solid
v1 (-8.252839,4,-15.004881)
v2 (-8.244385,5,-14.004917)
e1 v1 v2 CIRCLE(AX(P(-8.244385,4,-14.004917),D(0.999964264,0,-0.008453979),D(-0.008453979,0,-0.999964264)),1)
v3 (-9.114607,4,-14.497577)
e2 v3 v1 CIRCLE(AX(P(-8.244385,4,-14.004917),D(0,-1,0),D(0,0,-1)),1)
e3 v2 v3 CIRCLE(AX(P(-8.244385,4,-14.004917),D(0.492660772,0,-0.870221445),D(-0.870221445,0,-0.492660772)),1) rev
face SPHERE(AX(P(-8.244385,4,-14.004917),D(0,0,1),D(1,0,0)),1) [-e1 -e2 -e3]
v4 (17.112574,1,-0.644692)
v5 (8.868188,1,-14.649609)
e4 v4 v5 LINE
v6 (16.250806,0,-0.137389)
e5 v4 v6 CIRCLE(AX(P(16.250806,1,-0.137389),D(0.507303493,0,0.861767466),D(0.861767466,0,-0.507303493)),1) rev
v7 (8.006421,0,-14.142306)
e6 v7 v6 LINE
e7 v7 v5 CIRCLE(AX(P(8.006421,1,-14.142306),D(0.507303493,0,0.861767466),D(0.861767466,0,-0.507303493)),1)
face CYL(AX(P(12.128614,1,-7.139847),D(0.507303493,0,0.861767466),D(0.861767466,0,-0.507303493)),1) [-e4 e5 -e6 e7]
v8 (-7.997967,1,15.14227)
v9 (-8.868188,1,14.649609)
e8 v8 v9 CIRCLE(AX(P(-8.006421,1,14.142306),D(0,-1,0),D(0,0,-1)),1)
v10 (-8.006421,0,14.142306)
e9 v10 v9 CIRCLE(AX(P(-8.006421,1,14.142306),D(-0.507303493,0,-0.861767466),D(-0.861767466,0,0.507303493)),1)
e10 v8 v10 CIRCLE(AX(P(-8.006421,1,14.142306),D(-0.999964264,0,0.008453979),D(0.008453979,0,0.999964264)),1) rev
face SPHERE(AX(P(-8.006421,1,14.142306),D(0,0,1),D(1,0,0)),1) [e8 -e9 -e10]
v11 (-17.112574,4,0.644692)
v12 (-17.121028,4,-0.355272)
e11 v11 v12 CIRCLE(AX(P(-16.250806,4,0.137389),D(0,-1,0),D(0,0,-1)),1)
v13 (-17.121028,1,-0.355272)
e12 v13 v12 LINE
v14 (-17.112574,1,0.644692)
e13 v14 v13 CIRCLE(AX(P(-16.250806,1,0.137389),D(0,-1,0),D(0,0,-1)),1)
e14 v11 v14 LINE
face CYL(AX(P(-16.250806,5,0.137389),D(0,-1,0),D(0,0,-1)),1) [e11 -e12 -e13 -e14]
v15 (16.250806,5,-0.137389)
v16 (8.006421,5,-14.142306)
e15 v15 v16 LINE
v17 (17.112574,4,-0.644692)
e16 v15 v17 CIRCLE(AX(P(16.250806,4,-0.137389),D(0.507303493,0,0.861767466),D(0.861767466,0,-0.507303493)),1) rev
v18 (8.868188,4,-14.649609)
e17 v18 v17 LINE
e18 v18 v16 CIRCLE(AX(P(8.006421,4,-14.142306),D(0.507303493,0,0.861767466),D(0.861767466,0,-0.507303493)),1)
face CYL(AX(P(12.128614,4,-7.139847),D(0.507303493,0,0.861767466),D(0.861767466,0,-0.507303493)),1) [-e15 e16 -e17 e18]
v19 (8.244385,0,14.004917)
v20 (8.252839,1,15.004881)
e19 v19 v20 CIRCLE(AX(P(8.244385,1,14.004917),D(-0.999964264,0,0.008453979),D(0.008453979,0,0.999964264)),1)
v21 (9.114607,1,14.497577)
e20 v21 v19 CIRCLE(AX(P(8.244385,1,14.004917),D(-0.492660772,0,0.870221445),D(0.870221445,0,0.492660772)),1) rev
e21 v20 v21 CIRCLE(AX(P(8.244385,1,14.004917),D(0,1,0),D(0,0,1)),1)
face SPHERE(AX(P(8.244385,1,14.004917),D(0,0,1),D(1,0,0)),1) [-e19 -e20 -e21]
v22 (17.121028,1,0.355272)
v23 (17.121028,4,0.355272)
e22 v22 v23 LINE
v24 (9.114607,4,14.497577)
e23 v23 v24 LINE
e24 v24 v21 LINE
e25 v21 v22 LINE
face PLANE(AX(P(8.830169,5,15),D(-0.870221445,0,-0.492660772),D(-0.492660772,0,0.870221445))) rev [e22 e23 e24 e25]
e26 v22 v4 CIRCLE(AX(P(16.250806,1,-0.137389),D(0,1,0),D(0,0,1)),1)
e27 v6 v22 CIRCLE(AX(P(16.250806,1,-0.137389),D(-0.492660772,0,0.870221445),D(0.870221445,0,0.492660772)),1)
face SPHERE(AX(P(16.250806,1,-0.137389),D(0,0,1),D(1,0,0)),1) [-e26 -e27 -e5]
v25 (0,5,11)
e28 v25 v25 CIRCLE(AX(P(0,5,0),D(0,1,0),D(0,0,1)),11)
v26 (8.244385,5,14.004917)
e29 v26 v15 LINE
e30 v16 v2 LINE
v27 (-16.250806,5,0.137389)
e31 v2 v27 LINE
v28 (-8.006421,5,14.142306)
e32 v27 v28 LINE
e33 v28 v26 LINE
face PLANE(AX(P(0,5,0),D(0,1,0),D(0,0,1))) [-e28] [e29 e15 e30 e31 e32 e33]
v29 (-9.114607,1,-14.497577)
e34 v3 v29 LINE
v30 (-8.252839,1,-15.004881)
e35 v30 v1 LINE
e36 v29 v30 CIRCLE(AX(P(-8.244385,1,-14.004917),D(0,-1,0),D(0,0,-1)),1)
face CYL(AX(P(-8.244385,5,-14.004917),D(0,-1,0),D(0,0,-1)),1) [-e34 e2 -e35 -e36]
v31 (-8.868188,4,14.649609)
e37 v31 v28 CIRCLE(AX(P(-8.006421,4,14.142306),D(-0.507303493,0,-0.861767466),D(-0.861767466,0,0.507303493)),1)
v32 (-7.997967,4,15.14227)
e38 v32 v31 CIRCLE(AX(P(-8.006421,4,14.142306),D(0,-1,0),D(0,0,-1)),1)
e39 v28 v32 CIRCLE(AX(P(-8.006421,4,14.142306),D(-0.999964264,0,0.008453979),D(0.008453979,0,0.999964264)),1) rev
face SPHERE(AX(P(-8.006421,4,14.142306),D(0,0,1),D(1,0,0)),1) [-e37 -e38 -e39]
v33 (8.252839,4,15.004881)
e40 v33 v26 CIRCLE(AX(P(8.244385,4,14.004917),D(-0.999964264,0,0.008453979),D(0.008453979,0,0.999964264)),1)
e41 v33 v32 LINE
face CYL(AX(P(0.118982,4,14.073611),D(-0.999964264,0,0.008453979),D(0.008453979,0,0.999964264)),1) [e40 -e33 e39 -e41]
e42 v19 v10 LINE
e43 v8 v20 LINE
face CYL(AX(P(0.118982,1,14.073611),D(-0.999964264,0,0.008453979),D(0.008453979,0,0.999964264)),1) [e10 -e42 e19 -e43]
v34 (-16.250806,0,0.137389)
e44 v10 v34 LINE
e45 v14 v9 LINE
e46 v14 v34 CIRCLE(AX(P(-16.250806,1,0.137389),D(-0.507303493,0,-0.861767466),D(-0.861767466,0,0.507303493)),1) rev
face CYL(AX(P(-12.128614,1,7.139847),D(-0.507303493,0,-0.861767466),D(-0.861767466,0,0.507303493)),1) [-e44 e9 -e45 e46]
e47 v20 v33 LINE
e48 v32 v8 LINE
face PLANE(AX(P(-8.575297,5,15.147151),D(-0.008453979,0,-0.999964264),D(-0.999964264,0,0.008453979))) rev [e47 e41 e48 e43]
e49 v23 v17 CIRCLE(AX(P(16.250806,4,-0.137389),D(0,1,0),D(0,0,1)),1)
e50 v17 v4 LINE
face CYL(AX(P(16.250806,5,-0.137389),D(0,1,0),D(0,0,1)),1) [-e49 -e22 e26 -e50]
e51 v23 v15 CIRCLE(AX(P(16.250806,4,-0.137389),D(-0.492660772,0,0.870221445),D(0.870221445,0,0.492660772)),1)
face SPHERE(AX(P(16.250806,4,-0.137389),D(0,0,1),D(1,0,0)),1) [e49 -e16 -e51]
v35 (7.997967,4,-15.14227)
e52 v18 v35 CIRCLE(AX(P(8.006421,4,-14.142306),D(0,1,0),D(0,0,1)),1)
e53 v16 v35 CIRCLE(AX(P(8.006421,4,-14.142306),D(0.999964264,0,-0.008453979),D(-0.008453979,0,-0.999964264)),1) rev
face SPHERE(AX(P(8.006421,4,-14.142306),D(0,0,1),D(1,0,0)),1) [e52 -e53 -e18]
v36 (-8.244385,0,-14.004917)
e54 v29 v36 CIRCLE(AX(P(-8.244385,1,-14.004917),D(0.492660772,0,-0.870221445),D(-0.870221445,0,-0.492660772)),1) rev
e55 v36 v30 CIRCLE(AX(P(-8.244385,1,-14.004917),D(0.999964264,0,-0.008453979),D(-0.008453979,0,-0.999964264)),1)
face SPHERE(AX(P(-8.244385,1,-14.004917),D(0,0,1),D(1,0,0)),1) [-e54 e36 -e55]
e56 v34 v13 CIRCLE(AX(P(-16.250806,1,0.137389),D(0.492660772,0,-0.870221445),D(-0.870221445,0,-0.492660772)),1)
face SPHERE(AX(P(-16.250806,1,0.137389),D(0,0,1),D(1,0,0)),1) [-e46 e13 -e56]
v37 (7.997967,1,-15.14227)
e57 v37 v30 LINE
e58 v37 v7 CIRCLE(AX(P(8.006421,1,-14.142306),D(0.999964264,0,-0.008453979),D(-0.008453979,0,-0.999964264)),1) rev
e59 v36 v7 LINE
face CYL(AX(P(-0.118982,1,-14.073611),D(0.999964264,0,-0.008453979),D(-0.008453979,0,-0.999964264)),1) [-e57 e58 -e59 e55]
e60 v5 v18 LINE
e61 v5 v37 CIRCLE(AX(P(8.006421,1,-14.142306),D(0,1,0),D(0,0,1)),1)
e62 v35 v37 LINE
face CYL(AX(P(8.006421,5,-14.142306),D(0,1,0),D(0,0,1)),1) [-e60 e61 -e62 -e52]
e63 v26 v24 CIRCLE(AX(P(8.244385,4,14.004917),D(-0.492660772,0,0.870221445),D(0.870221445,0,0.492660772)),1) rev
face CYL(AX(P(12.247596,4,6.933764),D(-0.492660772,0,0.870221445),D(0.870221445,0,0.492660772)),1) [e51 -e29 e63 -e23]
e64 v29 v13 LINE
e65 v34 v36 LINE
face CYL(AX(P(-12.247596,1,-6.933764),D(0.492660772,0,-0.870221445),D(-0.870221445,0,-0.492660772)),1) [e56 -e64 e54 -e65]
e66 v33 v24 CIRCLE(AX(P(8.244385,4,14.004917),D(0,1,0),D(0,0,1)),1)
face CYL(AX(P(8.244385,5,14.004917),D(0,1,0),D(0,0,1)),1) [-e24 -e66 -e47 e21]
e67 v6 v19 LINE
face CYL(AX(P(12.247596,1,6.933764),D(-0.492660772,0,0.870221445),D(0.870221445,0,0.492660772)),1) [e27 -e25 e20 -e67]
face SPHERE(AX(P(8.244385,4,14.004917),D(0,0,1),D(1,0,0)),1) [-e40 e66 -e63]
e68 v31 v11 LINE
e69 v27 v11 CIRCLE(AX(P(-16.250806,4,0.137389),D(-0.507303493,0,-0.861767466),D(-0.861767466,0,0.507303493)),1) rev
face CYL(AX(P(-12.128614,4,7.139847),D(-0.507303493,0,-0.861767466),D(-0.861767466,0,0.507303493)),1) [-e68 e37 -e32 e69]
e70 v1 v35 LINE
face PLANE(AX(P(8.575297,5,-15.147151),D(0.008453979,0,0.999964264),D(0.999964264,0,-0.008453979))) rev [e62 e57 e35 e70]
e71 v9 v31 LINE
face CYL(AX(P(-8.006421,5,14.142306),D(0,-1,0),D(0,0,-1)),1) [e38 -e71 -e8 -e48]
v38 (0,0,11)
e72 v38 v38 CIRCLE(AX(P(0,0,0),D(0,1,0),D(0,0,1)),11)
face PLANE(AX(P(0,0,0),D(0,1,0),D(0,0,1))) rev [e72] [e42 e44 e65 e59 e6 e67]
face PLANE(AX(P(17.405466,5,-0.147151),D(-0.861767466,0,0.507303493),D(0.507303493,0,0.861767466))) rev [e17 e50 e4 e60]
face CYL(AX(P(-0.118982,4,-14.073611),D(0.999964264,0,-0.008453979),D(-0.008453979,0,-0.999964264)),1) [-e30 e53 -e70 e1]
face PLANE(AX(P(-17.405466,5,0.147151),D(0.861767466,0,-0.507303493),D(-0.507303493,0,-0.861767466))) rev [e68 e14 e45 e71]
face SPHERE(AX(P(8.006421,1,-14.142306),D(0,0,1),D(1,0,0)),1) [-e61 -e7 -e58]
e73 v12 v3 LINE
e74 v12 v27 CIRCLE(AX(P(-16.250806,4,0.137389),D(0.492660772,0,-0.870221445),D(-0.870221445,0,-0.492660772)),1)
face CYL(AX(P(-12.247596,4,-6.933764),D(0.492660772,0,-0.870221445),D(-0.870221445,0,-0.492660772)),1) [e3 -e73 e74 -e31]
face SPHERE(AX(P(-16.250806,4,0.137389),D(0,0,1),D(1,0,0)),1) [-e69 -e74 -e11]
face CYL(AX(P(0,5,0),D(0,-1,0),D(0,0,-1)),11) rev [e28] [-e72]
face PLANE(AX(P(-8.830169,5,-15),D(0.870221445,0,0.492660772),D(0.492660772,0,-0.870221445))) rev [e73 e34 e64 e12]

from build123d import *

# Parameters (mm, degrees)
SKETCH1_R           = 11
BOSS_EXTRUDE1_DEPTH = 5
FILLET1_R           = 1
FILLET2_R           = 1
FILLET3_R           = 1
FILLET4_R           = 1
FILLET5_R           = 1
FILLET6_R           = 1
FILLET7_R           = 1
FILLET8_R           = 1


with BuildPart() as part:
    # Sketch1 → Boss-Extrude1 (new body)
    with BuildSketch(Plane(origin=(0, 0, 0), x_dir=(1, 0, 0), z_dir=(0, 1, 0))):
        Polygon((8.83016903, -15), (17.405465572, 0.1471507), (8.575296542, 15.1471507), (-8.83016903, 15), (-17.405465572, -0.1471507), (-8.575296542, -15.1471507), align=None)
        with Locations(Location((0, 0, 0), (0, 0, 270))):
            Circle(SKETCH1_R, mode=Mode.SUBTRACT)
    extrude(amount=BOSS_EXTRUDE1_DEPTH)

    # Fillet1
    fillet1_edges = [part.edges().sort_by_distance(p)[0] for p in [
        (-12.990381057, 0, 7.6471507),
        (-13.117817301, 0, -7.42642465),
        (-0.127436244, 0, -15.07357535),
        (12.990381057, 0, -7.6471507),
        (13.117817301, 0, 7.42642465),
        (0.127436244, 0, 15.07357535),
    ]]
    fillet(fillet1_edges, radius=FILLET1_R)

    # Fillet2
    fillet2_edges = [part.edges().sort_by_distance(p)[0] for p in [
        (12.990381057, 5, -7.6471507),
        (-0.127436244, 5, -15.07357535),
        (-13.117817301, 5, -7.42642465),
        (-12.990381057, 5, 7.6471507),
        (0.127436244, 5, 15.07357535),
        (13.117817301, 5, 7.42642465),
    ]]
    fillet(fillet2_edges, radius=FILLET2_R)

    # Fillet3
    # the kernel refuses this fillet: 1 mm, written as the material it takes off along each edge
    with BuildSketch(Plane(origin=(8.244385414, 1, 14.004916643), x_dir=(0.870221445448491, 0, 0.4926607716081514), z_dir=(0, -1, 0))) as fillet3_piece_1_section:
        Polygon((0, 0), (FILLET3_R, 0), (FILLET3_R, FILLET3_R * 0.57735026919), (FILLET3_R * 0.5, FILLET3_R * 0.866025403784), align=None)
    fillet3_piece_1 = extrude(amount=FILLET3_R, mode=Mode.PRIVATE)
    fillet3_piece_1 = fillet3_piece_1 - Plane(origin=(8.244385414, 1, 14.004916643), x_dir=(-0.5073034928723316, 0, -0.8617674663849478), z_dir=(0, -1, 0)) * Sphere(FILLET3_R, mode=Mode.PRIVATE)
    add(fillet3_piece_1, mode=Mode.SUBTRACT)
    with BuildSketch(Plane(origin=(8.244385414, 4, 14.004916643), x_dir=(0.870221445448491, 0, 0.4926607716081514), z_dir=(0, 1, 0))) as fillet3_piece_2_section:
        Polygon((0, 0), (FILLET3_R, 0), (FILLET3_R, -FILLET3_R * 0.57735026919), (FILLET3_R * 0.5, -FILLET3_R * 0.866025403784), align=None)
    fillet3_piece_2 = extrude(amount=FILLET3_R, mode=Mode.PRIVATE)
    fillet3_piece_2 = fillet3_piece_2 - Plane(origin=(8.244385414, 4, 14.004916643), x_dir=(-0.5073034928723316, 0, -0.8617674663849478), z_dir=(0, 1, 0)) * Sphere(FILLET3_R, mode=Mode.PRIVATE)
    add(fillet3_piece_2, mode=Mode.SUBTRACT)
    with BuildSketch(Plane(origin=(8.83016903, 1, 15), x_dir=(0.4926607716081517, 0, -0.8702214454484907), z_dir=(0, 1, 0))) as fillet3_piece_3:
        with BuildLine():
            CenterArc((FILLET3_R * 0.57735026919, FILLET3_R), FILLET3_R, 210, 60)
            Line((-FILLET3_R * 0.288675134595, FILLET3_R * 0.5), (0, 0))
            Line((0, 0), (FILLET3_R * 0.57735026919, 0))
        make_face()
    extrude(amount=3, mode=Mode.SUBTRACT)

    # Fillet4
    # the kernel refuses this fillet: 1 mm, written as the material it takes off along each edge
    with BuildSketch(Plane(origin=(-8.006420883, 1, 14.142305528), x_dir=(0.008453979063543083, 0, 0.999964264480483), z_dir=(0, -1, 0))) as fillet4_piece_1_section:
        Polygon((0, 0), (FILLET4_R, 0), (FILLET4_R, FILLET4_R * 0.57735026919), (FILLET4_R * 0.5, FILLET4_R * 0.866025403784), align=None)
    fillet4_piece_1 = extrude(amount=FILLET4_R, mode=Mode.PRIVATE)
    fillet4_piece_1 = fillet4_piece_1 - Plane(origin=(-8.006420883, 1, 14.142305528), x_dir=(0.49266077160815147, 0, -0.870221445448491), z_dir=(0, -1, 0)) * Sphere(FILLET4_R, mode=Mode.PRIVATE)
    add(fillet4_piece_1, mode=Mode.SUBTRACT)
    with BuildSketch(Plane(origin=(-8.006420883, 4, 14.142305528), x_dir=(0.008453979063543083, 0, 0.999964264480483), z_dir=(0, 1, 0))) as fillet4_piece_2_section:
        Polygon((0, 0), (FILLET4_R, 0), (FILLET4_R, -FILLET4_R * 0.57735026919), (FILLET4_R * 0.5, -FILLET4_R * 0.866025403784), align=None)
    fillet4_piece_2 = extrude(amount=FILLET4_R, mode=Mode.PRIVATE)
    fillet4_piece_2 = fillet4_piece_2 - Plane(origin=(-8.006420883, 4, 14.142305528), x_dir=(0.49266077160815147, 0, -0.870221445448491), z_dir=(0, 1, 0)) * Sphere(FILLET4_R, mode=Mode.PRIVATE)
    add(fillet4_piece_2, mode=Mode.SUBTRACT)
    with BuildSketch(Plane(origin=(-8.575296542, 1, 15.1471507), x_dir=(0.9999642644804829, 0, -0.008453979063542578), z_dir=(0, 1, 0))) as fillet4_piece_3:
        with BuildLine():
            CenterArc((FILLET4_R * 0.57735026919, FILLET4_R), FILLET4_R, 210, 60)
            Line((-FILLET4_R * 0.288675134595, FILLET4_R * 0.5), (0, 0))
            Line((0, 0), (FILLET4_R * 0.57735026919, 0))
        make_face()
    extrude(amount=3, mode=Mode.SUBTRACT)

    # Fillet5
    # the kernel refuses this fillet: 1 mm, written as the material it takes off along each edge
    with BuildSketch(Plane(origin=(-16.250806297, 1, 0.137388886), x_dir=(-0.870221445448491, 0, -0.49266077160815136), z_dir=(0, -1, 0))) as fillet5_piece_1_section:
        Polygon((0, 0), (FILLET5_R, 0), (FILLET5_R, -FILLET5_R * 0.57735026919), (FILLET5_R * 0.5, -FILLET5_R * 0.866025403784), align=None)
    fillet5_piece_1 = extrude(amount=FILLET5_R, mode=Mode.PRIVATE)
    fillet5_piece_1 = fillet5_piece_1 - Plane(origin=(-16.250806297, 1, 0.137388886), x_dir=(0.9999642644804829, 0, -0.008453979063543034), z_dir=(0, -1, 0)) * Sphere(FILLET5_R, mode=Mode.PRIVATE)
    add(fillet5_piece_1, mode=Mode.SUBTRACT)
    with BuildSketch(Plane(origin=(-16.250806297, 4, 0.137388886), x_dir=(-0.870221445448491, 0, -0.49266077160815136), z_dir=(0, 1, 0))) as fillet5_piece_2_section:
        Polygon((0, 0), (FILLET5_R, 0), (FILLET5_R, FILLET5_R * 0.57735026919), (FILLET5_R * 0.5, FILLET5_R * 0.866025403784), align=None)
    fillet5_piece_2 = extrude(amount=FILLET5_R, mode=Mode.PRIVATE)
    fillet5_piece_2 = fillet5_piece_2 - Plane(origin=(-16.250806297, 4, 0.137388886), x_dir=(0.9999642644804829, 0, -0.008453979063543034), z_dir=(0, 1, 0)) * Sphere(FILLET5_R, mode=Mode.PRIVATE)
    add(fillet5_piece_2, mode=Mode.SUBTRACT)
    with BuildSketch(Plane(origin=(-17.405465572, 1, 0.1471507), x_dir=(0.4926607716081488, 0, -0.8702214454484924), z_dir=(0, 1, 0))) as fillet5_piece_3:
        with BuildLine():
            CenterArc((FILLET5_R * 0.57735026919, -FILLET5_R), FILLET5_R, 90, 60)
            Line((-FILLET5_R * 0.288675134595, -FILLET5_R * 0.5), (0, 0))
            Line((0, 0), (FILLET5_R * 0.57735026919, 0))
        make_face()
    extrude(amount=3, mode=Mode.SUBTRACT)

    # Fillet6
    # the kernel refuses this fillet: 1 mm, written as the material it takes off along each edge
    with BuildSketch(Plane(origin=(-8.244385414, 1, -14.004916643), x_dir=(-0.008453979063543077, 0, -0.9999642644804829), z_dir=(0, -1, 0))) as fillet6_piece_1_section:
        Polygon((0, 0), (FILLET6_R, 0), (FILLET6_R, -FILLET6_R * 0.57735026919), (FILLET6_R * 0.5, -FILLET6_R * 0.866025403784), align=None)
    fillet6_piece_1 = extrude(amount=FILLET6_R, mode=Mode.PRIVATE)
    fillet6_piece_1 = fillet6_piece_1 - Plane(origin=(-8.244385414, 1, -14.004916643), x_dir=(0.5073034928723316, 0, 0.8617674663849478), z_dir=(0, -1, 0)) * Sphere(FILLET6_R, mode=Mode.PRIVATE)
    add(fillet6_piece_1, mode=Mode.SUBTRACT)
    with BuildSketch(Plane(origin=(-8.244385414, 4, -14.004916643), x_dir=(-0.008453979063543077, 0, -0.9999642644804829), z_dir=(0, 1, 0))) as fillet6_piece_2_section:
        Polygon((0, 0), (FILLET6_R, 0), (FILLET6_R, FILLET6_R * 0.57735026919), (FILLET6_R * 0.5, FILLET6_R * 0.866025403784), align=None)
    fillet6_piece_2 = extrude(amount=FILLET6_R, mode=Mode.PRIVATE)
    fillet6_piece_2 = fillet6_piece_2 - Plane(origin=(-8.244385414, 4, -14.004916643), x_dir=(0.5073034928723316, 0, 0.8617674663849478), z_dir=(0, 1, 0)) * Sphere(FILLET6_R, mode=Mode.PRIVATE)
    add(fillet6_piece_2, mode=Mode.SUBTRACT)
    with BuildSketch(Plane(origin=(-8.83016903, 1, -15), x_dir=(0.9999642644804829, 0, -0.008453979063542578), z_dir=(0, 1, 0))) as fillet6_piece_3:
        with BuildLine():
            CenterArc((FILLET6_R * 0.57735026919, -FILLET6_R), FILLET6_R, 90, 60)
            Line((-FILLET6_R * 0.288675134595, -FILLET6_R * 0.5), (0, 0))
            Line((0, 0), (FILLET6_R * 0.57735026919, 0))
        make_face()
    extrude(amount=3, mode=Mode.SUBTRACT)

    # Fillet7
    # the kernel refuses this fillet: 1 mm, written as the material it takes off along each edge
    with BuildSketch(Plane(origin=(8.006420883, 1, -14.142305528), x_dir=(0.8617674663849478, 0, -0.5073034928723317), z_dir=(0, -1, 0))) as fillet7_piece_1_section:
        Polygon((0, 0), (FILLET7_R, 0), (FILLET7_R, -FILLET7_R * 0.57735026919), (FILLET7_R * 0.5, -FILLET7_R * 0.866025403784), align=None)
    fillet7_piece_1 = extrude(amount=FILLET7_R, mode=Mode.PRIVATE)
    fillet7_piece_1 = fillet7_piece_1 - Plane(origin=(8.006420883, 1, -14.142305528), x_dir=(-0.4926607716081513, 0, 0.870221445448491), z_dir=(0, -1, 0)) * Sphere(FILLET7_R, mode=Mode.PRIVATE)
    add(fillet7_piece_1, mode=Mode.SUBTRACT)
    with BuildSketch(Plane(origin=(8.006420883, 4, -14.142305528), x_dir=(0.8617674663849478, 0, -0.5073034928723317), z_dir=(0, 1, 0))) as fillet7_piece_2_section:
        Polygon((0, 0), (FILLET7_R, 0), (FILLET7_R, FILLET7_R * 0.57735026919), (FILLET7_R * 0.5, FILLET7_R * 0.866025403784), align=None)
    fillet7_piece_2 = extrude(amount=FILLET7_R, mode=Mode.PRIVATE)
    fillet7_piece_2 = fillet7_piece_2 - Plane(origin=(8.006420883, 4, -14.142305528), x_dir=(-0.4926607716081513, 0, 0.870221445448491), z_dir=(0, 1, 0)) * Sphere(FILLET7_R, mode=Mode.PRIVATE)
    add(fillet7_piece_2, mode=Mode.SUBTRACT)
    with BuildSketch(Plane(origin=(8.575296542, 1, -15.1471507), x_dir=(0.507303492872331, 0, 0.8617674663849483), z_dir=(0, 1, 0))) as fillet7_piece_3:
        with BuildLine():
            CenterArc((FILLET7_R * 0.57735026919, -FILLET7_R), FILLET7_R, 90, 60)
            Line((-FILLET7_R * 0.288675134595, -FILLET7_R * 0.5), (0, 0))
            Line((0, 0), (FILLET7_R * 0.57735026919, 0))
        make_face()
    extrude(amount=3, mode=Mode.SUBTRACT)

    # Fillet8
    # the kernel refuses this fillet: 1 mm, written as the material it takes off along each edge
    with BuildSketch(Plane(origin=(16.250806297, 1, -0.137388886), x_dir=(0.870221445448491, 0, 0.4926607716081514), z_dir=(0, -1, 0))) as fillet8_piece_1_section:
        Polygon((0, 0), (FILLET8_R, 0), (FILLET8_R, -FILLET8_R * 0.57735026919), (FILLET8_R * 0.5, -FILLET8_R * 0.866025403784), align=None)
    fillet8_piece_1 = extrude(amount=FILLET8_R, mode=Mode.PRIVATE)
    fillet8_piece_1 = fillet8_piece_1 - Plane(origin=(16.250806297, 1, -0.137388886), x_dir=(-0.9999642644804829, 0, 0.00845397906354313), z_dir=(0, -1, 0)) * Sphere(FILLET8_R, mode=Mode.PRIVATE)
    add(fillet8_piece_1, mode=Mode.SUBTRACT)
    with BuildSketch(Plane(origin=(16.250806297, 4, -0.137388886), x_dir=(0.870221445448491, 0, 0.4926607716081514), z_dir=(0, 1, 0))) as fillet8_piece_2_section:
        Polygon((0, 0), (FILLET8_R, 0), (FILLET8_R, FILLET8_R * 0.57735026919), (FILLET8_R * 0.5, FILLET8_R * 0.866025403784), align=None)
    fillet8_piece_2 = extrude(amount=FILLET8_R, mode=Mode.PRIVATE)
    fillet8_piece_2 = fillet8_piece_2 - Plane(origin=(16.250806297, 4, -0.137388886), x_dir=(-0.9999642644804829, 0, 0.00845397906354313), z_dir=(0, 1, 0)) * Sphere(FILLET8_R, mode=Mode.PRIVATE)
    add(fillet8_piece_2, mode=Mode.SUBTRACT)
    with BuildSketch(Plane(origin=(17.405465572, 1, -0.1471507), x_dir=(-0.4926607716081509, 0, 0.8702214454484912), z_dir=(0, 1, 0))) as fillet8_piece_3:
        with BuildLine():
            CenterArc((FILLET8_R * 0.57735026919, -FILLET8_R), FILLET8_R, 90, 60)
            Line((-FILLET8_R * 0.288675134595, -FILLET8_R * 0.5), (0, 0))
            Line((0, 0), (FILLET8_R * 0.57735026919, 0))
        make_face()
    extrude(amount=3, mode=Mode.SUBTRACT)


solid = part.part
